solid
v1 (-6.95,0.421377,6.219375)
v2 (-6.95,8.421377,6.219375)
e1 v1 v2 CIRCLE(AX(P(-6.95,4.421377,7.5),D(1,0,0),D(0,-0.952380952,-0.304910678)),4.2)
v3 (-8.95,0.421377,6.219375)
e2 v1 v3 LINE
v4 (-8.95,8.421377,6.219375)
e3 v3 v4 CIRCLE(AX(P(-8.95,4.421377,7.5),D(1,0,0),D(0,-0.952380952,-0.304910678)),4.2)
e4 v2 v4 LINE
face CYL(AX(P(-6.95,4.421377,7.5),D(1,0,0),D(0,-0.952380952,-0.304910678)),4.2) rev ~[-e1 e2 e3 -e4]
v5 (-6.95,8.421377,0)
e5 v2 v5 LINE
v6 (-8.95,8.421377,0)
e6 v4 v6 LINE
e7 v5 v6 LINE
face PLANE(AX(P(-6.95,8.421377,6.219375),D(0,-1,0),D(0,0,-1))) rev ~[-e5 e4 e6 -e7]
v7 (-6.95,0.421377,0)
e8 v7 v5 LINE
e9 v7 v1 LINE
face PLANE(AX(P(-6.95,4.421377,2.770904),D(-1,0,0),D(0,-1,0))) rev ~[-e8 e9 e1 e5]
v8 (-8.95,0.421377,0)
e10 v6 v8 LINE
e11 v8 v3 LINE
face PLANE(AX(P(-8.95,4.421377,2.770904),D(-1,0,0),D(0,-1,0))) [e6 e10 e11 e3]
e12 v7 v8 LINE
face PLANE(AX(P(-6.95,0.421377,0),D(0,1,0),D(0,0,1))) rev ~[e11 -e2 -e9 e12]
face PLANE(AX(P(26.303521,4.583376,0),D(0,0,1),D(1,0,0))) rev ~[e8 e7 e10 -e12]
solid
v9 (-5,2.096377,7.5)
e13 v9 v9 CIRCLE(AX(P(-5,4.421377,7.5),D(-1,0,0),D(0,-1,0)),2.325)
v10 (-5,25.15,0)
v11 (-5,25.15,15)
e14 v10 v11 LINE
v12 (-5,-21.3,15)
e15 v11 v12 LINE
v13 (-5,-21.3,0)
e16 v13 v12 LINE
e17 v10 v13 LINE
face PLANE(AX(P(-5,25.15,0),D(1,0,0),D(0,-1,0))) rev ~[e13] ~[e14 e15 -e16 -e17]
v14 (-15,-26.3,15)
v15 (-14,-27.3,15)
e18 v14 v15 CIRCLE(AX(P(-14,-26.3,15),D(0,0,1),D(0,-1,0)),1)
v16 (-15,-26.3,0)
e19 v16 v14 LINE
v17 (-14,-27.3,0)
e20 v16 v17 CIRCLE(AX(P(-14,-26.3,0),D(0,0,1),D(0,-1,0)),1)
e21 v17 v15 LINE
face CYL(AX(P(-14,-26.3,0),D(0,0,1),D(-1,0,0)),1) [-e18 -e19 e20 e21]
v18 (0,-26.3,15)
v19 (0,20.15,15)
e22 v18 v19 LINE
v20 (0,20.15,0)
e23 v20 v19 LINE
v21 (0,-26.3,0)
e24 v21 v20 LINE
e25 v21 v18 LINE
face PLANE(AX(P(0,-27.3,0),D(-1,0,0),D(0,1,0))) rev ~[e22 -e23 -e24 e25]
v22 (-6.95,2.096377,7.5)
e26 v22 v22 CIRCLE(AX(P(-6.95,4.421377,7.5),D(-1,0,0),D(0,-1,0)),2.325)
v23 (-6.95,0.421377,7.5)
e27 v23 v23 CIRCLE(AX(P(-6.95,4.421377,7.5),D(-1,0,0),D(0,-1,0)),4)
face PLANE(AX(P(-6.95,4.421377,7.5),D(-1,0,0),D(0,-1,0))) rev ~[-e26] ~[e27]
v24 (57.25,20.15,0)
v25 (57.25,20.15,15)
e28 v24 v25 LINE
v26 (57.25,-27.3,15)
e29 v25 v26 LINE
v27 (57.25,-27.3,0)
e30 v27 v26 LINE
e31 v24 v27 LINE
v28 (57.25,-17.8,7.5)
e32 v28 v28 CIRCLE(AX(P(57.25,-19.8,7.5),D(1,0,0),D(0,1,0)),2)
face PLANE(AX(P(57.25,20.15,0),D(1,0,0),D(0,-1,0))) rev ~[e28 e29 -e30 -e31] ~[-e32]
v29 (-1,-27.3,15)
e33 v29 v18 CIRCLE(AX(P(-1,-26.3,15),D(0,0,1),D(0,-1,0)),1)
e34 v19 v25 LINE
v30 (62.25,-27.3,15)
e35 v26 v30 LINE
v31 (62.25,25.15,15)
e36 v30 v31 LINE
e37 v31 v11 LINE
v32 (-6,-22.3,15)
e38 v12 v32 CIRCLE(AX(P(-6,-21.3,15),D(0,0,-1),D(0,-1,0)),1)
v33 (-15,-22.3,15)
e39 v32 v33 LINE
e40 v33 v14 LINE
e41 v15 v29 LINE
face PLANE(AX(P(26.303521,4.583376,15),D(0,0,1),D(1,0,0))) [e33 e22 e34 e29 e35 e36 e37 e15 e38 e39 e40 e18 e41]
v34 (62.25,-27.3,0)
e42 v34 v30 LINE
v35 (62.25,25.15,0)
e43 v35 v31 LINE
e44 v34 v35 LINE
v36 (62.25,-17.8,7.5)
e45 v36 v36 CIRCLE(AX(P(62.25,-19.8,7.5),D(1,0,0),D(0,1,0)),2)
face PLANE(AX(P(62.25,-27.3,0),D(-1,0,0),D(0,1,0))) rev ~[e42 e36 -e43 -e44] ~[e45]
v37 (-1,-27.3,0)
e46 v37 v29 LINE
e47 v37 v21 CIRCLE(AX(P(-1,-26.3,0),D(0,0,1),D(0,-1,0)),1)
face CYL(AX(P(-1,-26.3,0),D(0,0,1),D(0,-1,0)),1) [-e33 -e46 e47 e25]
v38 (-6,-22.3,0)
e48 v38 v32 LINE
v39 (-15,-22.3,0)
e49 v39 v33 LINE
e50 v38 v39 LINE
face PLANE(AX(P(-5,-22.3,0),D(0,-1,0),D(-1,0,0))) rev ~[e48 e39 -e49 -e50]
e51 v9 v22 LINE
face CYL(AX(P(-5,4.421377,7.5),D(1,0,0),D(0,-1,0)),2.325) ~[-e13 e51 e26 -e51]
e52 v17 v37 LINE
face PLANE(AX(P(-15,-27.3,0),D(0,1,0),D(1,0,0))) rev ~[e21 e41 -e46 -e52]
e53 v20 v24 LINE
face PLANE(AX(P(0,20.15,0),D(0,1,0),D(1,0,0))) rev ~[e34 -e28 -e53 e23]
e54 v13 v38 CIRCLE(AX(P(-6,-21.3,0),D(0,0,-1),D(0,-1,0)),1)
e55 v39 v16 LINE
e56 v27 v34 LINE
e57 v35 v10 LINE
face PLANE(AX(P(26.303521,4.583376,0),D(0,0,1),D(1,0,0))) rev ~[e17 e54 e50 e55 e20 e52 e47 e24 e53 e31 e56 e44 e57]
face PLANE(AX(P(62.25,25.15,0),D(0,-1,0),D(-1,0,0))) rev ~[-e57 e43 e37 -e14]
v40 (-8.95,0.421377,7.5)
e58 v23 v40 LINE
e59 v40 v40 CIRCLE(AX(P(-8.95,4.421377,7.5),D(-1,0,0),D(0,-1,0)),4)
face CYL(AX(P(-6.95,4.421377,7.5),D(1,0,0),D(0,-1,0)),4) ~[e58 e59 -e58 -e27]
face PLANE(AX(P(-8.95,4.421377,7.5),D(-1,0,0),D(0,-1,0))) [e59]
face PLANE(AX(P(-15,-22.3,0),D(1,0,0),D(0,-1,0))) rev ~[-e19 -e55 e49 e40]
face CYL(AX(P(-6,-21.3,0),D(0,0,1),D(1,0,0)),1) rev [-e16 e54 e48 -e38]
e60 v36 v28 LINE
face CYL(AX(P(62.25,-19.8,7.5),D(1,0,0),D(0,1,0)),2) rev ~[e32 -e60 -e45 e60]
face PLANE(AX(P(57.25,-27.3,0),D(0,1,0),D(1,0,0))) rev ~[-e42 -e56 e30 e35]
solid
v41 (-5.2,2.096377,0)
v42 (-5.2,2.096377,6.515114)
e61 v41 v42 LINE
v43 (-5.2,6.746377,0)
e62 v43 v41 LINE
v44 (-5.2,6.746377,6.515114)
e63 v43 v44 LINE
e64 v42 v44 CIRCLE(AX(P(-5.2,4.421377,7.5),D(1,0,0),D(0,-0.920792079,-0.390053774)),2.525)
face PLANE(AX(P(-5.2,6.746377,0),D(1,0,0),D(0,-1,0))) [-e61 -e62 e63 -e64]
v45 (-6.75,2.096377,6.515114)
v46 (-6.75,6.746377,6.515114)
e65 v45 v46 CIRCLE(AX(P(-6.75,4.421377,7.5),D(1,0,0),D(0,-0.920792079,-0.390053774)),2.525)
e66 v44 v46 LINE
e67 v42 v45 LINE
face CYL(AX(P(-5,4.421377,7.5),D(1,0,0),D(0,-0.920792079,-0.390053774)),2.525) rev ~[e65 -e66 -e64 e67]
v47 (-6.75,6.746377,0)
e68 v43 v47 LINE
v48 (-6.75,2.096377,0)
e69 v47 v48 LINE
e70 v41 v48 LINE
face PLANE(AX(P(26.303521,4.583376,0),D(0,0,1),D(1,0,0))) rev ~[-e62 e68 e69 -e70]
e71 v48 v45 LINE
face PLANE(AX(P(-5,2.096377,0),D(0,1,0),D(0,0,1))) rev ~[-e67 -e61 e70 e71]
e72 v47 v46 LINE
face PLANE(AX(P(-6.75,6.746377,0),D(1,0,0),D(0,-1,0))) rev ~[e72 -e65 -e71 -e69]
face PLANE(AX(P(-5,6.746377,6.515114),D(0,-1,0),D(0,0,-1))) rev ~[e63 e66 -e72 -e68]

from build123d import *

# Parameters (mm, degrees)
F1_DEPTH  = 15
F2_R      = 2.325
F3_DEPTH  = 1.95
F4_R      = 4
F5_DEPTH  = 2
F6_W      = 0.2
F6_H      = 4.65
F7_REACH  = 19.6552990879
F8_R      = 1
F9_R      = 2
F10_DEPTH = 5


with BuildPart() as f1:
    # F0 (on Top) → F1 (new body)
    with BuildSketch(Plane.XY):
        Polygon((0, 0), (0, 20.15), (57.25, 20.15), (57.25, -27.3), (62.25, -27.3), (62.25, 25.15), (-5, 25.15), (-5, 0), (-5, -22.3), (-15, -22.3), (-15, -27.3), (0, -27.3), (0, -22.3), align=None)
    extrude(amount=F1_DEPTH)

    # F2 (on face) → F3 (join)
    with BuildSketch(Plane(origin=(-5, 0, 0), x_dir=(0, -1, 0), z_dir=(-1, 0, 0))):
        with Locations((-4.4213766232, 7.5)):
            Circle(F2_R)
        with BuildLine():
            ThreePointArc((-2.0963766232, 6.5151142198), (-4.4213766232, 4.975), (-6.7463766232, 6.5151142198))
            Line((-6.7463766232, 6.5151142198), (-6.7463766232, 0))
            Line((-6.7463766232, 0), (-2.0963766232, 0))
            Line((-2.0963766232, 0), (-2.0963766232, 6.5151142198))
        make_face()
    extrude(amount=F3_DEPTH)

    # F4 (on face) → F5 (join)
    with BuildSketch(Plane(origin=(-6.95, 0, 0), x_dir=(0, -1, 0), z_dir=(-1, 0, 0))):
        with Locations((-4.4213766232, 7.5)):
            Circle(F4_R)
        with BuildLine():
            ThreePointArc((-0.4213766232, 6.2193751525), (-4.4213766232, 3.3), (-8.4213766232, 6.2193751525))
            Line((-8.4213766232, 6.2193751525), (-8.4213766232, 0))
            Line((-8.4213766232, 0), (-0.4213766232, 0))
            Line((-0.4213766232, 0), (-0.4213766232, 6.2193751525))
        make_face()
    extrude(amount=F5_DEPTH)

    f7_end = f1.faces().sort_by_distance((-5.975, 4.4213766232, 4.975))[0]
    # F6 (on face) → F7 (cut, up to a face of the model that its end follows)
    with BuildSketch(Plane(origin=(0, 0, 0), x_dir=(1, 0, 0), z_dir=(0, 0, -1))):
        with Locations((-5.1, -4.4213766232)):
            Rectangle(F6_W, F6_H)
        with Locations((-6.85, -4.4213766232)):
            Rectangle(F6_W, F6_H)
    f7_long = extrude(amount=-F7_REACH, mode=Mode.PRIVATE)
    add(split(f7_long, bisect_by=f7_end, keep=Keep.BOTTOM, mode=Mode.PRIVATE), mode=Mode.SUBTRACT)

    # F8
    f8_edges = [f1.edges().sort_by_distance(p)[0] for p in [
        (-5, -22.3, 7.5),
        (0, -27.3, 7.5),
        (-15, -27.3, 7.5),
    ]]
    fillet(f8_edges, radius=F8_R)

    # F9 (on face) → F10 (cut, through all)
    with BuildSketch(Plane.YZ.offset(62.25)):
        with Locations((-19.8, 7.5)):
            Circle(F9_R)
    extrude(amount=-F10_DEPTH, mode=Mode.SUBTRACT)


solid = f1.part
